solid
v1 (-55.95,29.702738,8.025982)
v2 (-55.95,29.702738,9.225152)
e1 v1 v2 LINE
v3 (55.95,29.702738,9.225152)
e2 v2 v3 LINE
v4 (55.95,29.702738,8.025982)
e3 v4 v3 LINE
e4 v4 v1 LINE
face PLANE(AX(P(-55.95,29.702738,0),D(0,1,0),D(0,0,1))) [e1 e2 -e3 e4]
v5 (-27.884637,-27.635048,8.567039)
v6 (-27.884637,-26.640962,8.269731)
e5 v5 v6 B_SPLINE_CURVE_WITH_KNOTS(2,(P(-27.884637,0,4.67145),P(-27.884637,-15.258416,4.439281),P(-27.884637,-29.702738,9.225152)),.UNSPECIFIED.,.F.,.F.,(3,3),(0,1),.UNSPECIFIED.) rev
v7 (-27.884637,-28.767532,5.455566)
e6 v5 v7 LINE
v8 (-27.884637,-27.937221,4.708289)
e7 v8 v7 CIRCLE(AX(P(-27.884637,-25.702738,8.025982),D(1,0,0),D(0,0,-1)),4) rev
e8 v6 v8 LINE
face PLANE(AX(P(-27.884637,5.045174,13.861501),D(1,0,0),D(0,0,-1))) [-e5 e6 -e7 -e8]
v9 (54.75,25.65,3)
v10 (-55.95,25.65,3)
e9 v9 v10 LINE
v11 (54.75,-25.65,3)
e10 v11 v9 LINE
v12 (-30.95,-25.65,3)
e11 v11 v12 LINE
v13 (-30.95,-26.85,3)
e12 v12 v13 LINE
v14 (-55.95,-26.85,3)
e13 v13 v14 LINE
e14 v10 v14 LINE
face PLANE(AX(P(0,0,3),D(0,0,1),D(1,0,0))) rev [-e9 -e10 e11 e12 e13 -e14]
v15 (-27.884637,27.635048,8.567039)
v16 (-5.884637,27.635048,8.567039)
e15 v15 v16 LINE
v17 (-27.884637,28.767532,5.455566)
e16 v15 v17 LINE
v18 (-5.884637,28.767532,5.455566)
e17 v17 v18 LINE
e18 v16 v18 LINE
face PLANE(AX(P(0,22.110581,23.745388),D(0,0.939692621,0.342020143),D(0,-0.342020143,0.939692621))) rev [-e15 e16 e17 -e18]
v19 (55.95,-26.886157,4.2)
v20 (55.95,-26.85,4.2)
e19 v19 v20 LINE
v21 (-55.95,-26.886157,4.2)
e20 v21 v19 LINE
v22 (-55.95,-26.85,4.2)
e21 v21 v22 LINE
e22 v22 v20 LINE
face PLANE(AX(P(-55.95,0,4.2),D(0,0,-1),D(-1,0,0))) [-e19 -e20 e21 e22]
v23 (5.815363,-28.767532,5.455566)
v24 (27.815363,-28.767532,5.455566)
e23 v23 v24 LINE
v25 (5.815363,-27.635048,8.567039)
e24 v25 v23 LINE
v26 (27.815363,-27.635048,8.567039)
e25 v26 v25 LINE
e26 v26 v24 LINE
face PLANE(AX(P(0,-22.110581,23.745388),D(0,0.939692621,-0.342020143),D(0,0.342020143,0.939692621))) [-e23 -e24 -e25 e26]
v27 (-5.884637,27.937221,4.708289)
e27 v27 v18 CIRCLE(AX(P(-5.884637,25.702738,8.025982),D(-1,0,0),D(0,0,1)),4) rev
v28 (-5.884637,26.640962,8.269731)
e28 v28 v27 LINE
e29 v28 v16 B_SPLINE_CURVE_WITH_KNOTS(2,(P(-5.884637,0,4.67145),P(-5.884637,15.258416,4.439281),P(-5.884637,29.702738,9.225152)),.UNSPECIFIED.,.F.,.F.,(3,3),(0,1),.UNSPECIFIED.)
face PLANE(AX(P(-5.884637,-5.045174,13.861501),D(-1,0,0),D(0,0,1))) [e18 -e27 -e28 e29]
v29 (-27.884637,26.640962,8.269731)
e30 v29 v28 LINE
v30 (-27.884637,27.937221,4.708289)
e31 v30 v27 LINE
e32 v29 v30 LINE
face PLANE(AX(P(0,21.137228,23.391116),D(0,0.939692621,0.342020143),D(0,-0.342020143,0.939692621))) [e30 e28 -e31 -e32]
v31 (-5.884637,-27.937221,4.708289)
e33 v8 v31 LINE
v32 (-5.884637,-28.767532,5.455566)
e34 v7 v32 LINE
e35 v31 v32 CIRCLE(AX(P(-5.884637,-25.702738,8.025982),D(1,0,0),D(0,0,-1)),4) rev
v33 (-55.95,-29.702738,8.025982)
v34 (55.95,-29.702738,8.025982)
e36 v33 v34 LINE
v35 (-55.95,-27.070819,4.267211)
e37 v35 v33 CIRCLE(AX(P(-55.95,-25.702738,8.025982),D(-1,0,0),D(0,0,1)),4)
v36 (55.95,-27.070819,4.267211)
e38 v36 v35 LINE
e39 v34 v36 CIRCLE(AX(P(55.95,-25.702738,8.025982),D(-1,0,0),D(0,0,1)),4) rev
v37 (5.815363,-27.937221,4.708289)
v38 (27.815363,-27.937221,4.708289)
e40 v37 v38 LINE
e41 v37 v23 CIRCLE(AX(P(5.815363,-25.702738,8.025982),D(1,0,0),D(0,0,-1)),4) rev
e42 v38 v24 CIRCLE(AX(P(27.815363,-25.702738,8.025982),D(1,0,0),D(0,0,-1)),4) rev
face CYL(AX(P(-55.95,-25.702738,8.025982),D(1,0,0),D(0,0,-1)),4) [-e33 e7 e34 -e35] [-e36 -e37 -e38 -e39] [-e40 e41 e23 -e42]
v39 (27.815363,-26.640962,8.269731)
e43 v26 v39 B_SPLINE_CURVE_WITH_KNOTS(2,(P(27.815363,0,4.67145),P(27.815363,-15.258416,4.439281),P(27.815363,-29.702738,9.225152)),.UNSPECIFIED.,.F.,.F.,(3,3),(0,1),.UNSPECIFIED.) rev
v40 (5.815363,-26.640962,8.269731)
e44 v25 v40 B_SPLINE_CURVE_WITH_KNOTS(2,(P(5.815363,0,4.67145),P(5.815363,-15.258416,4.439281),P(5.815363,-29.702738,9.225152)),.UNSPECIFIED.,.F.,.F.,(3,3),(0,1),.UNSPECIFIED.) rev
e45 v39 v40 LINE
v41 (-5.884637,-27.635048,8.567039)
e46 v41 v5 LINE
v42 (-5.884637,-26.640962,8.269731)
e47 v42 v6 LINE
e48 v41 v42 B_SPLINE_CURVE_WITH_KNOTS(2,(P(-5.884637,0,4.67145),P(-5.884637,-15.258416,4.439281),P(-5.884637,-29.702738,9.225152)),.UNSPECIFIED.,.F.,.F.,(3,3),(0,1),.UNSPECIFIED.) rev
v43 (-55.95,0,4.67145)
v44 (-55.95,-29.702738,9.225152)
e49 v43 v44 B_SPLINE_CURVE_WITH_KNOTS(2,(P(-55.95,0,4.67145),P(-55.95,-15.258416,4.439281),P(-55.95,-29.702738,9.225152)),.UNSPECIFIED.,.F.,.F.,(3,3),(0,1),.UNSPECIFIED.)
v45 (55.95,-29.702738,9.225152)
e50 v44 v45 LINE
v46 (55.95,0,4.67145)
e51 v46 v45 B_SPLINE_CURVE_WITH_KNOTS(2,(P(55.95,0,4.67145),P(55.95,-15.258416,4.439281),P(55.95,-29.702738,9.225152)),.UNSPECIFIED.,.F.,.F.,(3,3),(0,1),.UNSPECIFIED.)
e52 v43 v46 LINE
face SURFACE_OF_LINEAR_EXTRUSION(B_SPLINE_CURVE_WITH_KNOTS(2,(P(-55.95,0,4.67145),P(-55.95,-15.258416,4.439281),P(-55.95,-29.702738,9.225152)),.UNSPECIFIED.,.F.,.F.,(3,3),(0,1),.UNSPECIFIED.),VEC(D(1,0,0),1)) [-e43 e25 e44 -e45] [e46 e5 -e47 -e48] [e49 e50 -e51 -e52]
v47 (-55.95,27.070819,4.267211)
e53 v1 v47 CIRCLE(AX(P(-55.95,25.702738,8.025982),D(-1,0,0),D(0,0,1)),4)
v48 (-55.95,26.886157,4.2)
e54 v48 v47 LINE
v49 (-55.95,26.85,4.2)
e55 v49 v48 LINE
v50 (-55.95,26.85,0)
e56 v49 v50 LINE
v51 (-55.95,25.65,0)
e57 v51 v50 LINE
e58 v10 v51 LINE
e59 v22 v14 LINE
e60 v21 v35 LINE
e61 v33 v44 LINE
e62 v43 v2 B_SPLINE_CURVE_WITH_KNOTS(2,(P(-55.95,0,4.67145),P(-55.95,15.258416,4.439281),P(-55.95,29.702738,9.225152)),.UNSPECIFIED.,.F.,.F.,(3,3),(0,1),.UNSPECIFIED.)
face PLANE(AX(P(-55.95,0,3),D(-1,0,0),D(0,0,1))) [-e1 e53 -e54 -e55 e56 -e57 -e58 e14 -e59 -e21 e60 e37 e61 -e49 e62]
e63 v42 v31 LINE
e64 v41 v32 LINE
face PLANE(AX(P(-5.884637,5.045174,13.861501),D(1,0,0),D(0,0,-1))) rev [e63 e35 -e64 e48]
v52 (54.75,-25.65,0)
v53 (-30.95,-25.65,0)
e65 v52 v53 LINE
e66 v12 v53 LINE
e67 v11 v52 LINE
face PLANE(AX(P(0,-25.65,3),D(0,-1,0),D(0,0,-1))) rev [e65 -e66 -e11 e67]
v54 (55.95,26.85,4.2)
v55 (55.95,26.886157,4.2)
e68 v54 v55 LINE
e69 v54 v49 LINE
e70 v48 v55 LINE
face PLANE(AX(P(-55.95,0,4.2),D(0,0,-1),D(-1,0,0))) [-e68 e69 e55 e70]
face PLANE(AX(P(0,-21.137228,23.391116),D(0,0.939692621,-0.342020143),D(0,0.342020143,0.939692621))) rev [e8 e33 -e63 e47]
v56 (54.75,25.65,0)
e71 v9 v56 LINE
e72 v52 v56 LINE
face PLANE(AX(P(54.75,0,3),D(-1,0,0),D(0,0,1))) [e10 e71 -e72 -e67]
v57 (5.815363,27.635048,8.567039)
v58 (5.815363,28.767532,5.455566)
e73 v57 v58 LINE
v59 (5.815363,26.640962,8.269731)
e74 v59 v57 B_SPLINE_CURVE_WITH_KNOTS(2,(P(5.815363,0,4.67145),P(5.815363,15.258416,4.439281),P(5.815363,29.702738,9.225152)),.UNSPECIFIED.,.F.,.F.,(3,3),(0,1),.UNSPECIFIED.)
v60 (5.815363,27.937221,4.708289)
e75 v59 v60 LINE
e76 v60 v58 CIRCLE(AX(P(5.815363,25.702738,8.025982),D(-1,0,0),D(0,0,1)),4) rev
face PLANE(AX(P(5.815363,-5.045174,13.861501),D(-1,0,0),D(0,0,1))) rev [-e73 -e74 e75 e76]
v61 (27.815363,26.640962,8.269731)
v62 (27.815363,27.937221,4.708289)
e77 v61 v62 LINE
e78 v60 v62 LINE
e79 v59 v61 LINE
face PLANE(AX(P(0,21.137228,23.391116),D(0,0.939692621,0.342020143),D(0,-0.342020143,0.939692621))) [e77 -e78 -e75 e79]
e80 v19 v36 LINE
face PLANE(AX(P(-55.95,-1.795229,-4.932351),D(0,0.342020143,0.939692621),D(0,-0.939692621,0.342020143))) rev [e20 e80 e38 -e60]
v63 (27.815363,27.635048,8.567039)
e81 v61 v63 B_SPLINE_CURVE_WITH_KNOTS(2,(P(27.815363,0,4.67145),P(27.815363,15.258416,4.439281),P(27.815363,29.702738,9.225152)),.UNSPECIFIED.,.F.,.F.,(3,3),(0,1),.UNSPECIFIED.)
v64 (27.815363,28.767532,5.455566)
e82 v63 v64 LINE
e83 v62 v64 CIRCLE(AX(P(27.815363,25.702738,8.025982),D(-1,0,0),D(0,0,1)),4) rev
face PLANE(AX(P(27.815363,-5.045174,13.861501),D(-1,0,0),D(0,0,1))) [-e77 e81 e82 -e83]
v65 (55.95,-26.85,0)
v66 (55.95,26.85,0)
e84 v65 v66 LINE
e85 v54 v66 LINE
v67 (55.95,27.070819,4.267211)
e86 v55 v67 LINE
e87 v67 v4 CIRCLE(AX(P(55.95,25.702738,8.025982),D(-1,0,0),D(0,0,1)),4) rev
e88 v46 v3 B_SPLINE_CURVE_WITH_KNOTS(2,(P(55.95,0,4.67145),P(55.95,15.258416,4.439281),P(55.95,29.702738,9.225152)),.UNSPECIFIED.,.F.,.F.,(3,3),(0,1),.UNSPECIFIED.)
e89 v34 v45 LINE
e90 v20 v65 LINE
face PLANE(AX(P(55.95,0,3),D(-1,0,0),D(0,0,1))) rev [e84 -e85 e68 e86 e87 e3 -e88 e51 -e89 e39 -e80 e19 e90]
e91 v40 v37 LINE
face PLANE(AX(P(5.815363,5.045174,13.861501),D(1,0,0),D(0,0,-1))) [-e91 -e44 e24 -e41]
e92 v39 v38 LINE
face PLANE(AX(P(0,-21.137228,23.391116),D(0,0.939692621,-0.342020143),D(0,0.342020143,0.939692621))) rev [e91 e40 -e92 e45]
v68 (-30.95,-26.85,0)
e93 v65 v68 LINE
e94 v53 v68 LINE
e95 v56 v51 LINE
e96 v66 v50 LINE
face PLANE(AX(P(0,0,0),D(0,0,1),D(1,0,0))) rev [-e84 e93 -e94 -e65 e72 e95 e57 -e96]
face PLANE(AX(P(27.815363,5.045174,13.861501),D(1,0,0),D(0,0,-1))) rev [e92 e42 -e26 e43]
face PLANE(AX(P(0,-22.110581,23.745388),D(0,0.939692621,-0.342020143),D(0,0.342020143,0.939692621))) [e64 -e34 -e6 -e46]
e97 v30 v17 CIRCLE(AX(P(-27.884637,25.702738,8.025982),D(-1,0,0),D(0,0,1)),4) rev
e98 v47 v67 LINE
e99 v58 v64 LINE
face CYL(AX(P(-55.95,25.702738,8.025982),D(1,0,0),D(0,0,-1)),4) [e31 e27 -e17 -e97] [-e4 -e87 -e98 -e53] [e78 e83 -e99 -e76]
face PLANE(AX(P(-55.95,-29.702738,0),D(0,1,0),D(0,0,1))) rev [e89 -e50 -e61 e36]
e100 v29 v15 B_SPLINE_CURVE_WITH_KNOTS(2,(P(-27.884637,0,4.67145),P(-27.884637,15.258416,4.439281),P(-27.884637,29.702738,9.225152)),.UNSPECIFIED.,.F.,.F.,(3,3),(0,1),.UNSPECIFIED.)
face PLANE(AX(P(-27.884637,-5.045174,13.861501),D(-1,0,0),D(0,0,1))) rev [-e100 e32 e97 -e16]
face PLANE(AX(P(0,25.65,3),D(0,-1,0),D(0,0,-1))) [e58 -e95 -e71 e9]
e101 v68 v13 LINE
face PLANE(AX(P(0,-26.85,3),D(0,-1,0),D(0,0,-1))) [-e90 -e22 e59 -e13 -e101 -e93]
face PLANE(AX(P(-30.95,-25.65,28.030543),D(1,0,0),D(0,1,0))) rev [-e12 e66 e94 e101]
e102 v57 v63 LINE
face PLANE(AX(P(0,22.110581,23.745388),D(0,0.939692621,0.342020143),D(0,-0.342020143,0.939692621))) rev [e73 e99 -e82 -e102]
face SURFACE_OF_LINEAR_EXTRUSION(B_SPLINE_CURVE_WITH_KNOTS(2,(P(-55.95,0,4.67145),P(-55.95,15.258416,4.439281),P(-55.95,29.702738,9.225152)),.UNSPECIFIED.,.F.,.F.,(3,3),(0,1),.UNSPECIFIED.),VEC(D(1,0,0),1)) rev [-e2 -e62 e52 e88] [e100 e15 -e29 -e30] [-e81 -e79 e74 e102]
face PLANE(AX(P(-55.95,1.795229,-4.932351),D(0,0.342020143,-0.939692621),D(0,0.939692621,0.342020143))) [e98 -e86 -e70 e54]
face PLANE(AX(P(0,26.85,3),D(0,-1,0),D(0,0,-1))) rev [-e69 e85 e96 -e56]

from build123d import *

# Parameters (mm, degrees)
BOSS_EXTRUDE1_DEPTH = 3
SKETCH2_W           = 111.9
SKETCH2_H           = 53.7
BOSS_EXTRUDE2_DEPTH = 1.2
BOSS_EXTRUDE3_DEPTH = 111.9
SKETCH4_W           = 22
SKETCH4_H           = 1.035820464
CUT_EXTRUDE1_DEPTH  = 20
FILLET1_R           = 4
SKETCH5_W           = 25
SKETCH5_H           = 1.236157198
CUT_EXTRUDE2_DEPTH  = 3


with BuildPart() as part:
    # Sketch1 → Boss-Extrude1 (new body)
    with BuildSketch(Plane.XY):
        Polygon((-55.95, 25.65), (-54.75, 25.65), (54.75, 25.65), (54.75, -25.65), (-54.75, -25.65), (-55.95, -25.65), (-55.95, -26.85), (55.95, -26.85), (55.95, 26.85), (-55.95, 26.85), align=None)
    extrude(amount=BOSS_EXTRUDE1_DEPTH)

    # Sketch2 → Boss-Extrude2 (add)
    with BuildSketch(Plane.XY.offset(3)):
        Rectangle(SKETCH2_W, SKETCH2_H)
    extrude(amount=BOSS_EXTRUDE2_DEPTH)

    # Sketch3 → Boss-Extrude3 (add)
    with BuildSketch(Plane(origin=(55.95, 0, 0), x_dir=(0, 0, -1), z_dir=(1, 0, 0))):
        with BuildLine():
            Line((-4.2, -26.886157198), (-5.225151607, -29.702738088))
            Line((-5.225151607, -29.702738088), (-9.225151607, -29.702738088))
            add(Edge.make_bspline(
                [(-4.671449622, 0), (-4.439281188, -15.258416184), (-9.225151607, -29.702738088)],
                knots=[0, 0, 0, 1, 1, 1], degree=2))
            add(Edge.make_bspline(
                [(-4.671449622, 0), (-4.439281188, 15.258416184), (-9.225151607, 29.702738088)],
                knots=[0, 0, 0, 1, 1, 1], degree=2))
            Line((-9.225151607, 29.702738088), (-5.225151607, 29.702738088))
            Line((-5.225151607, 29.702738088), (-4.2, 26.886157198))
            Line((-4.2, 26.886157198), (-4.2, -26.886157198))
        make_face()
    extrude(amount=-BOSS_EXTRUDE3_DEPTH)

    # Sketch4 → Cut-Extrude1 (cut)
    with BuildSketch(Plane(origin=(0, 1.795228959, -4.932351029), x_dir=(-1, 0, 0), z_dir=(0, 0.3420201433256726, -0.939692620785907))):
        with Locations((-16.815363001, 28.380640668)):
            Rectangle(SKETCH4_W, SKETCH4_H)
        with Locations((16.884636999, 28.380640668)):
            Rectangle(SKETCH4_W, SKETCH4_H)
    cut_extrude1 = extrude(amount=-CUT_EXTRUDE1_DEPTH, mode=Mode.SUBTRACT)

    # Mirror1: Cut-Extrude1 across plane
    add(cut_extrude1.mirror(Plane.ZX), mode=Mode.SUBTRACT)

    # Fillet1
    # the kernel refuses this fillet: 4 mm, written as the material it takes off along each edge
    with BuildSketch(Plane(origin=(62.952075382, 29.702738088, 5.225151607), x_dir=(0, 0, 1), z_dir=(-1, 0, 0)), Plane(origin=(62.952075382, -29.702738088, 5.225151607), x_dir=(0, 0.9396926207859048, -0.34202014332567854), z_dir=(-1, 0, 0))) as fillet1_piece_1:
        with BuildLine():
            CenterArc((FILLET1_R * 0.70020753821, -FILLET1_R), FILLET1_R, 90, 70)
            Line((-FILLET1_R * 0.239485082576, -FILLET1_R * 0.657979856674), (0, 0))
            Line((0, 0), (FILLET1_R * 0.70020753821, 0))
        make_face()
    extrude(amount=125.904150764, mode=Mode.SUBTRACT)

    # Sketch5 → Cut-Extrude2 (cut)
    with BuildSketch(Plane(origin=(0, 0, 0), x_dir=(-1, 0, 0), z_dir=(0, 0, -1))):
        with Locations((43.45, -26.268078599)):
            Rectangle(SKETCH5_W, SKETCH5_H)
    extrude(amount=-CUT_EXTRUDE2_DEPTH, mode=Mode.SUBTRACT)


solid = part.part
